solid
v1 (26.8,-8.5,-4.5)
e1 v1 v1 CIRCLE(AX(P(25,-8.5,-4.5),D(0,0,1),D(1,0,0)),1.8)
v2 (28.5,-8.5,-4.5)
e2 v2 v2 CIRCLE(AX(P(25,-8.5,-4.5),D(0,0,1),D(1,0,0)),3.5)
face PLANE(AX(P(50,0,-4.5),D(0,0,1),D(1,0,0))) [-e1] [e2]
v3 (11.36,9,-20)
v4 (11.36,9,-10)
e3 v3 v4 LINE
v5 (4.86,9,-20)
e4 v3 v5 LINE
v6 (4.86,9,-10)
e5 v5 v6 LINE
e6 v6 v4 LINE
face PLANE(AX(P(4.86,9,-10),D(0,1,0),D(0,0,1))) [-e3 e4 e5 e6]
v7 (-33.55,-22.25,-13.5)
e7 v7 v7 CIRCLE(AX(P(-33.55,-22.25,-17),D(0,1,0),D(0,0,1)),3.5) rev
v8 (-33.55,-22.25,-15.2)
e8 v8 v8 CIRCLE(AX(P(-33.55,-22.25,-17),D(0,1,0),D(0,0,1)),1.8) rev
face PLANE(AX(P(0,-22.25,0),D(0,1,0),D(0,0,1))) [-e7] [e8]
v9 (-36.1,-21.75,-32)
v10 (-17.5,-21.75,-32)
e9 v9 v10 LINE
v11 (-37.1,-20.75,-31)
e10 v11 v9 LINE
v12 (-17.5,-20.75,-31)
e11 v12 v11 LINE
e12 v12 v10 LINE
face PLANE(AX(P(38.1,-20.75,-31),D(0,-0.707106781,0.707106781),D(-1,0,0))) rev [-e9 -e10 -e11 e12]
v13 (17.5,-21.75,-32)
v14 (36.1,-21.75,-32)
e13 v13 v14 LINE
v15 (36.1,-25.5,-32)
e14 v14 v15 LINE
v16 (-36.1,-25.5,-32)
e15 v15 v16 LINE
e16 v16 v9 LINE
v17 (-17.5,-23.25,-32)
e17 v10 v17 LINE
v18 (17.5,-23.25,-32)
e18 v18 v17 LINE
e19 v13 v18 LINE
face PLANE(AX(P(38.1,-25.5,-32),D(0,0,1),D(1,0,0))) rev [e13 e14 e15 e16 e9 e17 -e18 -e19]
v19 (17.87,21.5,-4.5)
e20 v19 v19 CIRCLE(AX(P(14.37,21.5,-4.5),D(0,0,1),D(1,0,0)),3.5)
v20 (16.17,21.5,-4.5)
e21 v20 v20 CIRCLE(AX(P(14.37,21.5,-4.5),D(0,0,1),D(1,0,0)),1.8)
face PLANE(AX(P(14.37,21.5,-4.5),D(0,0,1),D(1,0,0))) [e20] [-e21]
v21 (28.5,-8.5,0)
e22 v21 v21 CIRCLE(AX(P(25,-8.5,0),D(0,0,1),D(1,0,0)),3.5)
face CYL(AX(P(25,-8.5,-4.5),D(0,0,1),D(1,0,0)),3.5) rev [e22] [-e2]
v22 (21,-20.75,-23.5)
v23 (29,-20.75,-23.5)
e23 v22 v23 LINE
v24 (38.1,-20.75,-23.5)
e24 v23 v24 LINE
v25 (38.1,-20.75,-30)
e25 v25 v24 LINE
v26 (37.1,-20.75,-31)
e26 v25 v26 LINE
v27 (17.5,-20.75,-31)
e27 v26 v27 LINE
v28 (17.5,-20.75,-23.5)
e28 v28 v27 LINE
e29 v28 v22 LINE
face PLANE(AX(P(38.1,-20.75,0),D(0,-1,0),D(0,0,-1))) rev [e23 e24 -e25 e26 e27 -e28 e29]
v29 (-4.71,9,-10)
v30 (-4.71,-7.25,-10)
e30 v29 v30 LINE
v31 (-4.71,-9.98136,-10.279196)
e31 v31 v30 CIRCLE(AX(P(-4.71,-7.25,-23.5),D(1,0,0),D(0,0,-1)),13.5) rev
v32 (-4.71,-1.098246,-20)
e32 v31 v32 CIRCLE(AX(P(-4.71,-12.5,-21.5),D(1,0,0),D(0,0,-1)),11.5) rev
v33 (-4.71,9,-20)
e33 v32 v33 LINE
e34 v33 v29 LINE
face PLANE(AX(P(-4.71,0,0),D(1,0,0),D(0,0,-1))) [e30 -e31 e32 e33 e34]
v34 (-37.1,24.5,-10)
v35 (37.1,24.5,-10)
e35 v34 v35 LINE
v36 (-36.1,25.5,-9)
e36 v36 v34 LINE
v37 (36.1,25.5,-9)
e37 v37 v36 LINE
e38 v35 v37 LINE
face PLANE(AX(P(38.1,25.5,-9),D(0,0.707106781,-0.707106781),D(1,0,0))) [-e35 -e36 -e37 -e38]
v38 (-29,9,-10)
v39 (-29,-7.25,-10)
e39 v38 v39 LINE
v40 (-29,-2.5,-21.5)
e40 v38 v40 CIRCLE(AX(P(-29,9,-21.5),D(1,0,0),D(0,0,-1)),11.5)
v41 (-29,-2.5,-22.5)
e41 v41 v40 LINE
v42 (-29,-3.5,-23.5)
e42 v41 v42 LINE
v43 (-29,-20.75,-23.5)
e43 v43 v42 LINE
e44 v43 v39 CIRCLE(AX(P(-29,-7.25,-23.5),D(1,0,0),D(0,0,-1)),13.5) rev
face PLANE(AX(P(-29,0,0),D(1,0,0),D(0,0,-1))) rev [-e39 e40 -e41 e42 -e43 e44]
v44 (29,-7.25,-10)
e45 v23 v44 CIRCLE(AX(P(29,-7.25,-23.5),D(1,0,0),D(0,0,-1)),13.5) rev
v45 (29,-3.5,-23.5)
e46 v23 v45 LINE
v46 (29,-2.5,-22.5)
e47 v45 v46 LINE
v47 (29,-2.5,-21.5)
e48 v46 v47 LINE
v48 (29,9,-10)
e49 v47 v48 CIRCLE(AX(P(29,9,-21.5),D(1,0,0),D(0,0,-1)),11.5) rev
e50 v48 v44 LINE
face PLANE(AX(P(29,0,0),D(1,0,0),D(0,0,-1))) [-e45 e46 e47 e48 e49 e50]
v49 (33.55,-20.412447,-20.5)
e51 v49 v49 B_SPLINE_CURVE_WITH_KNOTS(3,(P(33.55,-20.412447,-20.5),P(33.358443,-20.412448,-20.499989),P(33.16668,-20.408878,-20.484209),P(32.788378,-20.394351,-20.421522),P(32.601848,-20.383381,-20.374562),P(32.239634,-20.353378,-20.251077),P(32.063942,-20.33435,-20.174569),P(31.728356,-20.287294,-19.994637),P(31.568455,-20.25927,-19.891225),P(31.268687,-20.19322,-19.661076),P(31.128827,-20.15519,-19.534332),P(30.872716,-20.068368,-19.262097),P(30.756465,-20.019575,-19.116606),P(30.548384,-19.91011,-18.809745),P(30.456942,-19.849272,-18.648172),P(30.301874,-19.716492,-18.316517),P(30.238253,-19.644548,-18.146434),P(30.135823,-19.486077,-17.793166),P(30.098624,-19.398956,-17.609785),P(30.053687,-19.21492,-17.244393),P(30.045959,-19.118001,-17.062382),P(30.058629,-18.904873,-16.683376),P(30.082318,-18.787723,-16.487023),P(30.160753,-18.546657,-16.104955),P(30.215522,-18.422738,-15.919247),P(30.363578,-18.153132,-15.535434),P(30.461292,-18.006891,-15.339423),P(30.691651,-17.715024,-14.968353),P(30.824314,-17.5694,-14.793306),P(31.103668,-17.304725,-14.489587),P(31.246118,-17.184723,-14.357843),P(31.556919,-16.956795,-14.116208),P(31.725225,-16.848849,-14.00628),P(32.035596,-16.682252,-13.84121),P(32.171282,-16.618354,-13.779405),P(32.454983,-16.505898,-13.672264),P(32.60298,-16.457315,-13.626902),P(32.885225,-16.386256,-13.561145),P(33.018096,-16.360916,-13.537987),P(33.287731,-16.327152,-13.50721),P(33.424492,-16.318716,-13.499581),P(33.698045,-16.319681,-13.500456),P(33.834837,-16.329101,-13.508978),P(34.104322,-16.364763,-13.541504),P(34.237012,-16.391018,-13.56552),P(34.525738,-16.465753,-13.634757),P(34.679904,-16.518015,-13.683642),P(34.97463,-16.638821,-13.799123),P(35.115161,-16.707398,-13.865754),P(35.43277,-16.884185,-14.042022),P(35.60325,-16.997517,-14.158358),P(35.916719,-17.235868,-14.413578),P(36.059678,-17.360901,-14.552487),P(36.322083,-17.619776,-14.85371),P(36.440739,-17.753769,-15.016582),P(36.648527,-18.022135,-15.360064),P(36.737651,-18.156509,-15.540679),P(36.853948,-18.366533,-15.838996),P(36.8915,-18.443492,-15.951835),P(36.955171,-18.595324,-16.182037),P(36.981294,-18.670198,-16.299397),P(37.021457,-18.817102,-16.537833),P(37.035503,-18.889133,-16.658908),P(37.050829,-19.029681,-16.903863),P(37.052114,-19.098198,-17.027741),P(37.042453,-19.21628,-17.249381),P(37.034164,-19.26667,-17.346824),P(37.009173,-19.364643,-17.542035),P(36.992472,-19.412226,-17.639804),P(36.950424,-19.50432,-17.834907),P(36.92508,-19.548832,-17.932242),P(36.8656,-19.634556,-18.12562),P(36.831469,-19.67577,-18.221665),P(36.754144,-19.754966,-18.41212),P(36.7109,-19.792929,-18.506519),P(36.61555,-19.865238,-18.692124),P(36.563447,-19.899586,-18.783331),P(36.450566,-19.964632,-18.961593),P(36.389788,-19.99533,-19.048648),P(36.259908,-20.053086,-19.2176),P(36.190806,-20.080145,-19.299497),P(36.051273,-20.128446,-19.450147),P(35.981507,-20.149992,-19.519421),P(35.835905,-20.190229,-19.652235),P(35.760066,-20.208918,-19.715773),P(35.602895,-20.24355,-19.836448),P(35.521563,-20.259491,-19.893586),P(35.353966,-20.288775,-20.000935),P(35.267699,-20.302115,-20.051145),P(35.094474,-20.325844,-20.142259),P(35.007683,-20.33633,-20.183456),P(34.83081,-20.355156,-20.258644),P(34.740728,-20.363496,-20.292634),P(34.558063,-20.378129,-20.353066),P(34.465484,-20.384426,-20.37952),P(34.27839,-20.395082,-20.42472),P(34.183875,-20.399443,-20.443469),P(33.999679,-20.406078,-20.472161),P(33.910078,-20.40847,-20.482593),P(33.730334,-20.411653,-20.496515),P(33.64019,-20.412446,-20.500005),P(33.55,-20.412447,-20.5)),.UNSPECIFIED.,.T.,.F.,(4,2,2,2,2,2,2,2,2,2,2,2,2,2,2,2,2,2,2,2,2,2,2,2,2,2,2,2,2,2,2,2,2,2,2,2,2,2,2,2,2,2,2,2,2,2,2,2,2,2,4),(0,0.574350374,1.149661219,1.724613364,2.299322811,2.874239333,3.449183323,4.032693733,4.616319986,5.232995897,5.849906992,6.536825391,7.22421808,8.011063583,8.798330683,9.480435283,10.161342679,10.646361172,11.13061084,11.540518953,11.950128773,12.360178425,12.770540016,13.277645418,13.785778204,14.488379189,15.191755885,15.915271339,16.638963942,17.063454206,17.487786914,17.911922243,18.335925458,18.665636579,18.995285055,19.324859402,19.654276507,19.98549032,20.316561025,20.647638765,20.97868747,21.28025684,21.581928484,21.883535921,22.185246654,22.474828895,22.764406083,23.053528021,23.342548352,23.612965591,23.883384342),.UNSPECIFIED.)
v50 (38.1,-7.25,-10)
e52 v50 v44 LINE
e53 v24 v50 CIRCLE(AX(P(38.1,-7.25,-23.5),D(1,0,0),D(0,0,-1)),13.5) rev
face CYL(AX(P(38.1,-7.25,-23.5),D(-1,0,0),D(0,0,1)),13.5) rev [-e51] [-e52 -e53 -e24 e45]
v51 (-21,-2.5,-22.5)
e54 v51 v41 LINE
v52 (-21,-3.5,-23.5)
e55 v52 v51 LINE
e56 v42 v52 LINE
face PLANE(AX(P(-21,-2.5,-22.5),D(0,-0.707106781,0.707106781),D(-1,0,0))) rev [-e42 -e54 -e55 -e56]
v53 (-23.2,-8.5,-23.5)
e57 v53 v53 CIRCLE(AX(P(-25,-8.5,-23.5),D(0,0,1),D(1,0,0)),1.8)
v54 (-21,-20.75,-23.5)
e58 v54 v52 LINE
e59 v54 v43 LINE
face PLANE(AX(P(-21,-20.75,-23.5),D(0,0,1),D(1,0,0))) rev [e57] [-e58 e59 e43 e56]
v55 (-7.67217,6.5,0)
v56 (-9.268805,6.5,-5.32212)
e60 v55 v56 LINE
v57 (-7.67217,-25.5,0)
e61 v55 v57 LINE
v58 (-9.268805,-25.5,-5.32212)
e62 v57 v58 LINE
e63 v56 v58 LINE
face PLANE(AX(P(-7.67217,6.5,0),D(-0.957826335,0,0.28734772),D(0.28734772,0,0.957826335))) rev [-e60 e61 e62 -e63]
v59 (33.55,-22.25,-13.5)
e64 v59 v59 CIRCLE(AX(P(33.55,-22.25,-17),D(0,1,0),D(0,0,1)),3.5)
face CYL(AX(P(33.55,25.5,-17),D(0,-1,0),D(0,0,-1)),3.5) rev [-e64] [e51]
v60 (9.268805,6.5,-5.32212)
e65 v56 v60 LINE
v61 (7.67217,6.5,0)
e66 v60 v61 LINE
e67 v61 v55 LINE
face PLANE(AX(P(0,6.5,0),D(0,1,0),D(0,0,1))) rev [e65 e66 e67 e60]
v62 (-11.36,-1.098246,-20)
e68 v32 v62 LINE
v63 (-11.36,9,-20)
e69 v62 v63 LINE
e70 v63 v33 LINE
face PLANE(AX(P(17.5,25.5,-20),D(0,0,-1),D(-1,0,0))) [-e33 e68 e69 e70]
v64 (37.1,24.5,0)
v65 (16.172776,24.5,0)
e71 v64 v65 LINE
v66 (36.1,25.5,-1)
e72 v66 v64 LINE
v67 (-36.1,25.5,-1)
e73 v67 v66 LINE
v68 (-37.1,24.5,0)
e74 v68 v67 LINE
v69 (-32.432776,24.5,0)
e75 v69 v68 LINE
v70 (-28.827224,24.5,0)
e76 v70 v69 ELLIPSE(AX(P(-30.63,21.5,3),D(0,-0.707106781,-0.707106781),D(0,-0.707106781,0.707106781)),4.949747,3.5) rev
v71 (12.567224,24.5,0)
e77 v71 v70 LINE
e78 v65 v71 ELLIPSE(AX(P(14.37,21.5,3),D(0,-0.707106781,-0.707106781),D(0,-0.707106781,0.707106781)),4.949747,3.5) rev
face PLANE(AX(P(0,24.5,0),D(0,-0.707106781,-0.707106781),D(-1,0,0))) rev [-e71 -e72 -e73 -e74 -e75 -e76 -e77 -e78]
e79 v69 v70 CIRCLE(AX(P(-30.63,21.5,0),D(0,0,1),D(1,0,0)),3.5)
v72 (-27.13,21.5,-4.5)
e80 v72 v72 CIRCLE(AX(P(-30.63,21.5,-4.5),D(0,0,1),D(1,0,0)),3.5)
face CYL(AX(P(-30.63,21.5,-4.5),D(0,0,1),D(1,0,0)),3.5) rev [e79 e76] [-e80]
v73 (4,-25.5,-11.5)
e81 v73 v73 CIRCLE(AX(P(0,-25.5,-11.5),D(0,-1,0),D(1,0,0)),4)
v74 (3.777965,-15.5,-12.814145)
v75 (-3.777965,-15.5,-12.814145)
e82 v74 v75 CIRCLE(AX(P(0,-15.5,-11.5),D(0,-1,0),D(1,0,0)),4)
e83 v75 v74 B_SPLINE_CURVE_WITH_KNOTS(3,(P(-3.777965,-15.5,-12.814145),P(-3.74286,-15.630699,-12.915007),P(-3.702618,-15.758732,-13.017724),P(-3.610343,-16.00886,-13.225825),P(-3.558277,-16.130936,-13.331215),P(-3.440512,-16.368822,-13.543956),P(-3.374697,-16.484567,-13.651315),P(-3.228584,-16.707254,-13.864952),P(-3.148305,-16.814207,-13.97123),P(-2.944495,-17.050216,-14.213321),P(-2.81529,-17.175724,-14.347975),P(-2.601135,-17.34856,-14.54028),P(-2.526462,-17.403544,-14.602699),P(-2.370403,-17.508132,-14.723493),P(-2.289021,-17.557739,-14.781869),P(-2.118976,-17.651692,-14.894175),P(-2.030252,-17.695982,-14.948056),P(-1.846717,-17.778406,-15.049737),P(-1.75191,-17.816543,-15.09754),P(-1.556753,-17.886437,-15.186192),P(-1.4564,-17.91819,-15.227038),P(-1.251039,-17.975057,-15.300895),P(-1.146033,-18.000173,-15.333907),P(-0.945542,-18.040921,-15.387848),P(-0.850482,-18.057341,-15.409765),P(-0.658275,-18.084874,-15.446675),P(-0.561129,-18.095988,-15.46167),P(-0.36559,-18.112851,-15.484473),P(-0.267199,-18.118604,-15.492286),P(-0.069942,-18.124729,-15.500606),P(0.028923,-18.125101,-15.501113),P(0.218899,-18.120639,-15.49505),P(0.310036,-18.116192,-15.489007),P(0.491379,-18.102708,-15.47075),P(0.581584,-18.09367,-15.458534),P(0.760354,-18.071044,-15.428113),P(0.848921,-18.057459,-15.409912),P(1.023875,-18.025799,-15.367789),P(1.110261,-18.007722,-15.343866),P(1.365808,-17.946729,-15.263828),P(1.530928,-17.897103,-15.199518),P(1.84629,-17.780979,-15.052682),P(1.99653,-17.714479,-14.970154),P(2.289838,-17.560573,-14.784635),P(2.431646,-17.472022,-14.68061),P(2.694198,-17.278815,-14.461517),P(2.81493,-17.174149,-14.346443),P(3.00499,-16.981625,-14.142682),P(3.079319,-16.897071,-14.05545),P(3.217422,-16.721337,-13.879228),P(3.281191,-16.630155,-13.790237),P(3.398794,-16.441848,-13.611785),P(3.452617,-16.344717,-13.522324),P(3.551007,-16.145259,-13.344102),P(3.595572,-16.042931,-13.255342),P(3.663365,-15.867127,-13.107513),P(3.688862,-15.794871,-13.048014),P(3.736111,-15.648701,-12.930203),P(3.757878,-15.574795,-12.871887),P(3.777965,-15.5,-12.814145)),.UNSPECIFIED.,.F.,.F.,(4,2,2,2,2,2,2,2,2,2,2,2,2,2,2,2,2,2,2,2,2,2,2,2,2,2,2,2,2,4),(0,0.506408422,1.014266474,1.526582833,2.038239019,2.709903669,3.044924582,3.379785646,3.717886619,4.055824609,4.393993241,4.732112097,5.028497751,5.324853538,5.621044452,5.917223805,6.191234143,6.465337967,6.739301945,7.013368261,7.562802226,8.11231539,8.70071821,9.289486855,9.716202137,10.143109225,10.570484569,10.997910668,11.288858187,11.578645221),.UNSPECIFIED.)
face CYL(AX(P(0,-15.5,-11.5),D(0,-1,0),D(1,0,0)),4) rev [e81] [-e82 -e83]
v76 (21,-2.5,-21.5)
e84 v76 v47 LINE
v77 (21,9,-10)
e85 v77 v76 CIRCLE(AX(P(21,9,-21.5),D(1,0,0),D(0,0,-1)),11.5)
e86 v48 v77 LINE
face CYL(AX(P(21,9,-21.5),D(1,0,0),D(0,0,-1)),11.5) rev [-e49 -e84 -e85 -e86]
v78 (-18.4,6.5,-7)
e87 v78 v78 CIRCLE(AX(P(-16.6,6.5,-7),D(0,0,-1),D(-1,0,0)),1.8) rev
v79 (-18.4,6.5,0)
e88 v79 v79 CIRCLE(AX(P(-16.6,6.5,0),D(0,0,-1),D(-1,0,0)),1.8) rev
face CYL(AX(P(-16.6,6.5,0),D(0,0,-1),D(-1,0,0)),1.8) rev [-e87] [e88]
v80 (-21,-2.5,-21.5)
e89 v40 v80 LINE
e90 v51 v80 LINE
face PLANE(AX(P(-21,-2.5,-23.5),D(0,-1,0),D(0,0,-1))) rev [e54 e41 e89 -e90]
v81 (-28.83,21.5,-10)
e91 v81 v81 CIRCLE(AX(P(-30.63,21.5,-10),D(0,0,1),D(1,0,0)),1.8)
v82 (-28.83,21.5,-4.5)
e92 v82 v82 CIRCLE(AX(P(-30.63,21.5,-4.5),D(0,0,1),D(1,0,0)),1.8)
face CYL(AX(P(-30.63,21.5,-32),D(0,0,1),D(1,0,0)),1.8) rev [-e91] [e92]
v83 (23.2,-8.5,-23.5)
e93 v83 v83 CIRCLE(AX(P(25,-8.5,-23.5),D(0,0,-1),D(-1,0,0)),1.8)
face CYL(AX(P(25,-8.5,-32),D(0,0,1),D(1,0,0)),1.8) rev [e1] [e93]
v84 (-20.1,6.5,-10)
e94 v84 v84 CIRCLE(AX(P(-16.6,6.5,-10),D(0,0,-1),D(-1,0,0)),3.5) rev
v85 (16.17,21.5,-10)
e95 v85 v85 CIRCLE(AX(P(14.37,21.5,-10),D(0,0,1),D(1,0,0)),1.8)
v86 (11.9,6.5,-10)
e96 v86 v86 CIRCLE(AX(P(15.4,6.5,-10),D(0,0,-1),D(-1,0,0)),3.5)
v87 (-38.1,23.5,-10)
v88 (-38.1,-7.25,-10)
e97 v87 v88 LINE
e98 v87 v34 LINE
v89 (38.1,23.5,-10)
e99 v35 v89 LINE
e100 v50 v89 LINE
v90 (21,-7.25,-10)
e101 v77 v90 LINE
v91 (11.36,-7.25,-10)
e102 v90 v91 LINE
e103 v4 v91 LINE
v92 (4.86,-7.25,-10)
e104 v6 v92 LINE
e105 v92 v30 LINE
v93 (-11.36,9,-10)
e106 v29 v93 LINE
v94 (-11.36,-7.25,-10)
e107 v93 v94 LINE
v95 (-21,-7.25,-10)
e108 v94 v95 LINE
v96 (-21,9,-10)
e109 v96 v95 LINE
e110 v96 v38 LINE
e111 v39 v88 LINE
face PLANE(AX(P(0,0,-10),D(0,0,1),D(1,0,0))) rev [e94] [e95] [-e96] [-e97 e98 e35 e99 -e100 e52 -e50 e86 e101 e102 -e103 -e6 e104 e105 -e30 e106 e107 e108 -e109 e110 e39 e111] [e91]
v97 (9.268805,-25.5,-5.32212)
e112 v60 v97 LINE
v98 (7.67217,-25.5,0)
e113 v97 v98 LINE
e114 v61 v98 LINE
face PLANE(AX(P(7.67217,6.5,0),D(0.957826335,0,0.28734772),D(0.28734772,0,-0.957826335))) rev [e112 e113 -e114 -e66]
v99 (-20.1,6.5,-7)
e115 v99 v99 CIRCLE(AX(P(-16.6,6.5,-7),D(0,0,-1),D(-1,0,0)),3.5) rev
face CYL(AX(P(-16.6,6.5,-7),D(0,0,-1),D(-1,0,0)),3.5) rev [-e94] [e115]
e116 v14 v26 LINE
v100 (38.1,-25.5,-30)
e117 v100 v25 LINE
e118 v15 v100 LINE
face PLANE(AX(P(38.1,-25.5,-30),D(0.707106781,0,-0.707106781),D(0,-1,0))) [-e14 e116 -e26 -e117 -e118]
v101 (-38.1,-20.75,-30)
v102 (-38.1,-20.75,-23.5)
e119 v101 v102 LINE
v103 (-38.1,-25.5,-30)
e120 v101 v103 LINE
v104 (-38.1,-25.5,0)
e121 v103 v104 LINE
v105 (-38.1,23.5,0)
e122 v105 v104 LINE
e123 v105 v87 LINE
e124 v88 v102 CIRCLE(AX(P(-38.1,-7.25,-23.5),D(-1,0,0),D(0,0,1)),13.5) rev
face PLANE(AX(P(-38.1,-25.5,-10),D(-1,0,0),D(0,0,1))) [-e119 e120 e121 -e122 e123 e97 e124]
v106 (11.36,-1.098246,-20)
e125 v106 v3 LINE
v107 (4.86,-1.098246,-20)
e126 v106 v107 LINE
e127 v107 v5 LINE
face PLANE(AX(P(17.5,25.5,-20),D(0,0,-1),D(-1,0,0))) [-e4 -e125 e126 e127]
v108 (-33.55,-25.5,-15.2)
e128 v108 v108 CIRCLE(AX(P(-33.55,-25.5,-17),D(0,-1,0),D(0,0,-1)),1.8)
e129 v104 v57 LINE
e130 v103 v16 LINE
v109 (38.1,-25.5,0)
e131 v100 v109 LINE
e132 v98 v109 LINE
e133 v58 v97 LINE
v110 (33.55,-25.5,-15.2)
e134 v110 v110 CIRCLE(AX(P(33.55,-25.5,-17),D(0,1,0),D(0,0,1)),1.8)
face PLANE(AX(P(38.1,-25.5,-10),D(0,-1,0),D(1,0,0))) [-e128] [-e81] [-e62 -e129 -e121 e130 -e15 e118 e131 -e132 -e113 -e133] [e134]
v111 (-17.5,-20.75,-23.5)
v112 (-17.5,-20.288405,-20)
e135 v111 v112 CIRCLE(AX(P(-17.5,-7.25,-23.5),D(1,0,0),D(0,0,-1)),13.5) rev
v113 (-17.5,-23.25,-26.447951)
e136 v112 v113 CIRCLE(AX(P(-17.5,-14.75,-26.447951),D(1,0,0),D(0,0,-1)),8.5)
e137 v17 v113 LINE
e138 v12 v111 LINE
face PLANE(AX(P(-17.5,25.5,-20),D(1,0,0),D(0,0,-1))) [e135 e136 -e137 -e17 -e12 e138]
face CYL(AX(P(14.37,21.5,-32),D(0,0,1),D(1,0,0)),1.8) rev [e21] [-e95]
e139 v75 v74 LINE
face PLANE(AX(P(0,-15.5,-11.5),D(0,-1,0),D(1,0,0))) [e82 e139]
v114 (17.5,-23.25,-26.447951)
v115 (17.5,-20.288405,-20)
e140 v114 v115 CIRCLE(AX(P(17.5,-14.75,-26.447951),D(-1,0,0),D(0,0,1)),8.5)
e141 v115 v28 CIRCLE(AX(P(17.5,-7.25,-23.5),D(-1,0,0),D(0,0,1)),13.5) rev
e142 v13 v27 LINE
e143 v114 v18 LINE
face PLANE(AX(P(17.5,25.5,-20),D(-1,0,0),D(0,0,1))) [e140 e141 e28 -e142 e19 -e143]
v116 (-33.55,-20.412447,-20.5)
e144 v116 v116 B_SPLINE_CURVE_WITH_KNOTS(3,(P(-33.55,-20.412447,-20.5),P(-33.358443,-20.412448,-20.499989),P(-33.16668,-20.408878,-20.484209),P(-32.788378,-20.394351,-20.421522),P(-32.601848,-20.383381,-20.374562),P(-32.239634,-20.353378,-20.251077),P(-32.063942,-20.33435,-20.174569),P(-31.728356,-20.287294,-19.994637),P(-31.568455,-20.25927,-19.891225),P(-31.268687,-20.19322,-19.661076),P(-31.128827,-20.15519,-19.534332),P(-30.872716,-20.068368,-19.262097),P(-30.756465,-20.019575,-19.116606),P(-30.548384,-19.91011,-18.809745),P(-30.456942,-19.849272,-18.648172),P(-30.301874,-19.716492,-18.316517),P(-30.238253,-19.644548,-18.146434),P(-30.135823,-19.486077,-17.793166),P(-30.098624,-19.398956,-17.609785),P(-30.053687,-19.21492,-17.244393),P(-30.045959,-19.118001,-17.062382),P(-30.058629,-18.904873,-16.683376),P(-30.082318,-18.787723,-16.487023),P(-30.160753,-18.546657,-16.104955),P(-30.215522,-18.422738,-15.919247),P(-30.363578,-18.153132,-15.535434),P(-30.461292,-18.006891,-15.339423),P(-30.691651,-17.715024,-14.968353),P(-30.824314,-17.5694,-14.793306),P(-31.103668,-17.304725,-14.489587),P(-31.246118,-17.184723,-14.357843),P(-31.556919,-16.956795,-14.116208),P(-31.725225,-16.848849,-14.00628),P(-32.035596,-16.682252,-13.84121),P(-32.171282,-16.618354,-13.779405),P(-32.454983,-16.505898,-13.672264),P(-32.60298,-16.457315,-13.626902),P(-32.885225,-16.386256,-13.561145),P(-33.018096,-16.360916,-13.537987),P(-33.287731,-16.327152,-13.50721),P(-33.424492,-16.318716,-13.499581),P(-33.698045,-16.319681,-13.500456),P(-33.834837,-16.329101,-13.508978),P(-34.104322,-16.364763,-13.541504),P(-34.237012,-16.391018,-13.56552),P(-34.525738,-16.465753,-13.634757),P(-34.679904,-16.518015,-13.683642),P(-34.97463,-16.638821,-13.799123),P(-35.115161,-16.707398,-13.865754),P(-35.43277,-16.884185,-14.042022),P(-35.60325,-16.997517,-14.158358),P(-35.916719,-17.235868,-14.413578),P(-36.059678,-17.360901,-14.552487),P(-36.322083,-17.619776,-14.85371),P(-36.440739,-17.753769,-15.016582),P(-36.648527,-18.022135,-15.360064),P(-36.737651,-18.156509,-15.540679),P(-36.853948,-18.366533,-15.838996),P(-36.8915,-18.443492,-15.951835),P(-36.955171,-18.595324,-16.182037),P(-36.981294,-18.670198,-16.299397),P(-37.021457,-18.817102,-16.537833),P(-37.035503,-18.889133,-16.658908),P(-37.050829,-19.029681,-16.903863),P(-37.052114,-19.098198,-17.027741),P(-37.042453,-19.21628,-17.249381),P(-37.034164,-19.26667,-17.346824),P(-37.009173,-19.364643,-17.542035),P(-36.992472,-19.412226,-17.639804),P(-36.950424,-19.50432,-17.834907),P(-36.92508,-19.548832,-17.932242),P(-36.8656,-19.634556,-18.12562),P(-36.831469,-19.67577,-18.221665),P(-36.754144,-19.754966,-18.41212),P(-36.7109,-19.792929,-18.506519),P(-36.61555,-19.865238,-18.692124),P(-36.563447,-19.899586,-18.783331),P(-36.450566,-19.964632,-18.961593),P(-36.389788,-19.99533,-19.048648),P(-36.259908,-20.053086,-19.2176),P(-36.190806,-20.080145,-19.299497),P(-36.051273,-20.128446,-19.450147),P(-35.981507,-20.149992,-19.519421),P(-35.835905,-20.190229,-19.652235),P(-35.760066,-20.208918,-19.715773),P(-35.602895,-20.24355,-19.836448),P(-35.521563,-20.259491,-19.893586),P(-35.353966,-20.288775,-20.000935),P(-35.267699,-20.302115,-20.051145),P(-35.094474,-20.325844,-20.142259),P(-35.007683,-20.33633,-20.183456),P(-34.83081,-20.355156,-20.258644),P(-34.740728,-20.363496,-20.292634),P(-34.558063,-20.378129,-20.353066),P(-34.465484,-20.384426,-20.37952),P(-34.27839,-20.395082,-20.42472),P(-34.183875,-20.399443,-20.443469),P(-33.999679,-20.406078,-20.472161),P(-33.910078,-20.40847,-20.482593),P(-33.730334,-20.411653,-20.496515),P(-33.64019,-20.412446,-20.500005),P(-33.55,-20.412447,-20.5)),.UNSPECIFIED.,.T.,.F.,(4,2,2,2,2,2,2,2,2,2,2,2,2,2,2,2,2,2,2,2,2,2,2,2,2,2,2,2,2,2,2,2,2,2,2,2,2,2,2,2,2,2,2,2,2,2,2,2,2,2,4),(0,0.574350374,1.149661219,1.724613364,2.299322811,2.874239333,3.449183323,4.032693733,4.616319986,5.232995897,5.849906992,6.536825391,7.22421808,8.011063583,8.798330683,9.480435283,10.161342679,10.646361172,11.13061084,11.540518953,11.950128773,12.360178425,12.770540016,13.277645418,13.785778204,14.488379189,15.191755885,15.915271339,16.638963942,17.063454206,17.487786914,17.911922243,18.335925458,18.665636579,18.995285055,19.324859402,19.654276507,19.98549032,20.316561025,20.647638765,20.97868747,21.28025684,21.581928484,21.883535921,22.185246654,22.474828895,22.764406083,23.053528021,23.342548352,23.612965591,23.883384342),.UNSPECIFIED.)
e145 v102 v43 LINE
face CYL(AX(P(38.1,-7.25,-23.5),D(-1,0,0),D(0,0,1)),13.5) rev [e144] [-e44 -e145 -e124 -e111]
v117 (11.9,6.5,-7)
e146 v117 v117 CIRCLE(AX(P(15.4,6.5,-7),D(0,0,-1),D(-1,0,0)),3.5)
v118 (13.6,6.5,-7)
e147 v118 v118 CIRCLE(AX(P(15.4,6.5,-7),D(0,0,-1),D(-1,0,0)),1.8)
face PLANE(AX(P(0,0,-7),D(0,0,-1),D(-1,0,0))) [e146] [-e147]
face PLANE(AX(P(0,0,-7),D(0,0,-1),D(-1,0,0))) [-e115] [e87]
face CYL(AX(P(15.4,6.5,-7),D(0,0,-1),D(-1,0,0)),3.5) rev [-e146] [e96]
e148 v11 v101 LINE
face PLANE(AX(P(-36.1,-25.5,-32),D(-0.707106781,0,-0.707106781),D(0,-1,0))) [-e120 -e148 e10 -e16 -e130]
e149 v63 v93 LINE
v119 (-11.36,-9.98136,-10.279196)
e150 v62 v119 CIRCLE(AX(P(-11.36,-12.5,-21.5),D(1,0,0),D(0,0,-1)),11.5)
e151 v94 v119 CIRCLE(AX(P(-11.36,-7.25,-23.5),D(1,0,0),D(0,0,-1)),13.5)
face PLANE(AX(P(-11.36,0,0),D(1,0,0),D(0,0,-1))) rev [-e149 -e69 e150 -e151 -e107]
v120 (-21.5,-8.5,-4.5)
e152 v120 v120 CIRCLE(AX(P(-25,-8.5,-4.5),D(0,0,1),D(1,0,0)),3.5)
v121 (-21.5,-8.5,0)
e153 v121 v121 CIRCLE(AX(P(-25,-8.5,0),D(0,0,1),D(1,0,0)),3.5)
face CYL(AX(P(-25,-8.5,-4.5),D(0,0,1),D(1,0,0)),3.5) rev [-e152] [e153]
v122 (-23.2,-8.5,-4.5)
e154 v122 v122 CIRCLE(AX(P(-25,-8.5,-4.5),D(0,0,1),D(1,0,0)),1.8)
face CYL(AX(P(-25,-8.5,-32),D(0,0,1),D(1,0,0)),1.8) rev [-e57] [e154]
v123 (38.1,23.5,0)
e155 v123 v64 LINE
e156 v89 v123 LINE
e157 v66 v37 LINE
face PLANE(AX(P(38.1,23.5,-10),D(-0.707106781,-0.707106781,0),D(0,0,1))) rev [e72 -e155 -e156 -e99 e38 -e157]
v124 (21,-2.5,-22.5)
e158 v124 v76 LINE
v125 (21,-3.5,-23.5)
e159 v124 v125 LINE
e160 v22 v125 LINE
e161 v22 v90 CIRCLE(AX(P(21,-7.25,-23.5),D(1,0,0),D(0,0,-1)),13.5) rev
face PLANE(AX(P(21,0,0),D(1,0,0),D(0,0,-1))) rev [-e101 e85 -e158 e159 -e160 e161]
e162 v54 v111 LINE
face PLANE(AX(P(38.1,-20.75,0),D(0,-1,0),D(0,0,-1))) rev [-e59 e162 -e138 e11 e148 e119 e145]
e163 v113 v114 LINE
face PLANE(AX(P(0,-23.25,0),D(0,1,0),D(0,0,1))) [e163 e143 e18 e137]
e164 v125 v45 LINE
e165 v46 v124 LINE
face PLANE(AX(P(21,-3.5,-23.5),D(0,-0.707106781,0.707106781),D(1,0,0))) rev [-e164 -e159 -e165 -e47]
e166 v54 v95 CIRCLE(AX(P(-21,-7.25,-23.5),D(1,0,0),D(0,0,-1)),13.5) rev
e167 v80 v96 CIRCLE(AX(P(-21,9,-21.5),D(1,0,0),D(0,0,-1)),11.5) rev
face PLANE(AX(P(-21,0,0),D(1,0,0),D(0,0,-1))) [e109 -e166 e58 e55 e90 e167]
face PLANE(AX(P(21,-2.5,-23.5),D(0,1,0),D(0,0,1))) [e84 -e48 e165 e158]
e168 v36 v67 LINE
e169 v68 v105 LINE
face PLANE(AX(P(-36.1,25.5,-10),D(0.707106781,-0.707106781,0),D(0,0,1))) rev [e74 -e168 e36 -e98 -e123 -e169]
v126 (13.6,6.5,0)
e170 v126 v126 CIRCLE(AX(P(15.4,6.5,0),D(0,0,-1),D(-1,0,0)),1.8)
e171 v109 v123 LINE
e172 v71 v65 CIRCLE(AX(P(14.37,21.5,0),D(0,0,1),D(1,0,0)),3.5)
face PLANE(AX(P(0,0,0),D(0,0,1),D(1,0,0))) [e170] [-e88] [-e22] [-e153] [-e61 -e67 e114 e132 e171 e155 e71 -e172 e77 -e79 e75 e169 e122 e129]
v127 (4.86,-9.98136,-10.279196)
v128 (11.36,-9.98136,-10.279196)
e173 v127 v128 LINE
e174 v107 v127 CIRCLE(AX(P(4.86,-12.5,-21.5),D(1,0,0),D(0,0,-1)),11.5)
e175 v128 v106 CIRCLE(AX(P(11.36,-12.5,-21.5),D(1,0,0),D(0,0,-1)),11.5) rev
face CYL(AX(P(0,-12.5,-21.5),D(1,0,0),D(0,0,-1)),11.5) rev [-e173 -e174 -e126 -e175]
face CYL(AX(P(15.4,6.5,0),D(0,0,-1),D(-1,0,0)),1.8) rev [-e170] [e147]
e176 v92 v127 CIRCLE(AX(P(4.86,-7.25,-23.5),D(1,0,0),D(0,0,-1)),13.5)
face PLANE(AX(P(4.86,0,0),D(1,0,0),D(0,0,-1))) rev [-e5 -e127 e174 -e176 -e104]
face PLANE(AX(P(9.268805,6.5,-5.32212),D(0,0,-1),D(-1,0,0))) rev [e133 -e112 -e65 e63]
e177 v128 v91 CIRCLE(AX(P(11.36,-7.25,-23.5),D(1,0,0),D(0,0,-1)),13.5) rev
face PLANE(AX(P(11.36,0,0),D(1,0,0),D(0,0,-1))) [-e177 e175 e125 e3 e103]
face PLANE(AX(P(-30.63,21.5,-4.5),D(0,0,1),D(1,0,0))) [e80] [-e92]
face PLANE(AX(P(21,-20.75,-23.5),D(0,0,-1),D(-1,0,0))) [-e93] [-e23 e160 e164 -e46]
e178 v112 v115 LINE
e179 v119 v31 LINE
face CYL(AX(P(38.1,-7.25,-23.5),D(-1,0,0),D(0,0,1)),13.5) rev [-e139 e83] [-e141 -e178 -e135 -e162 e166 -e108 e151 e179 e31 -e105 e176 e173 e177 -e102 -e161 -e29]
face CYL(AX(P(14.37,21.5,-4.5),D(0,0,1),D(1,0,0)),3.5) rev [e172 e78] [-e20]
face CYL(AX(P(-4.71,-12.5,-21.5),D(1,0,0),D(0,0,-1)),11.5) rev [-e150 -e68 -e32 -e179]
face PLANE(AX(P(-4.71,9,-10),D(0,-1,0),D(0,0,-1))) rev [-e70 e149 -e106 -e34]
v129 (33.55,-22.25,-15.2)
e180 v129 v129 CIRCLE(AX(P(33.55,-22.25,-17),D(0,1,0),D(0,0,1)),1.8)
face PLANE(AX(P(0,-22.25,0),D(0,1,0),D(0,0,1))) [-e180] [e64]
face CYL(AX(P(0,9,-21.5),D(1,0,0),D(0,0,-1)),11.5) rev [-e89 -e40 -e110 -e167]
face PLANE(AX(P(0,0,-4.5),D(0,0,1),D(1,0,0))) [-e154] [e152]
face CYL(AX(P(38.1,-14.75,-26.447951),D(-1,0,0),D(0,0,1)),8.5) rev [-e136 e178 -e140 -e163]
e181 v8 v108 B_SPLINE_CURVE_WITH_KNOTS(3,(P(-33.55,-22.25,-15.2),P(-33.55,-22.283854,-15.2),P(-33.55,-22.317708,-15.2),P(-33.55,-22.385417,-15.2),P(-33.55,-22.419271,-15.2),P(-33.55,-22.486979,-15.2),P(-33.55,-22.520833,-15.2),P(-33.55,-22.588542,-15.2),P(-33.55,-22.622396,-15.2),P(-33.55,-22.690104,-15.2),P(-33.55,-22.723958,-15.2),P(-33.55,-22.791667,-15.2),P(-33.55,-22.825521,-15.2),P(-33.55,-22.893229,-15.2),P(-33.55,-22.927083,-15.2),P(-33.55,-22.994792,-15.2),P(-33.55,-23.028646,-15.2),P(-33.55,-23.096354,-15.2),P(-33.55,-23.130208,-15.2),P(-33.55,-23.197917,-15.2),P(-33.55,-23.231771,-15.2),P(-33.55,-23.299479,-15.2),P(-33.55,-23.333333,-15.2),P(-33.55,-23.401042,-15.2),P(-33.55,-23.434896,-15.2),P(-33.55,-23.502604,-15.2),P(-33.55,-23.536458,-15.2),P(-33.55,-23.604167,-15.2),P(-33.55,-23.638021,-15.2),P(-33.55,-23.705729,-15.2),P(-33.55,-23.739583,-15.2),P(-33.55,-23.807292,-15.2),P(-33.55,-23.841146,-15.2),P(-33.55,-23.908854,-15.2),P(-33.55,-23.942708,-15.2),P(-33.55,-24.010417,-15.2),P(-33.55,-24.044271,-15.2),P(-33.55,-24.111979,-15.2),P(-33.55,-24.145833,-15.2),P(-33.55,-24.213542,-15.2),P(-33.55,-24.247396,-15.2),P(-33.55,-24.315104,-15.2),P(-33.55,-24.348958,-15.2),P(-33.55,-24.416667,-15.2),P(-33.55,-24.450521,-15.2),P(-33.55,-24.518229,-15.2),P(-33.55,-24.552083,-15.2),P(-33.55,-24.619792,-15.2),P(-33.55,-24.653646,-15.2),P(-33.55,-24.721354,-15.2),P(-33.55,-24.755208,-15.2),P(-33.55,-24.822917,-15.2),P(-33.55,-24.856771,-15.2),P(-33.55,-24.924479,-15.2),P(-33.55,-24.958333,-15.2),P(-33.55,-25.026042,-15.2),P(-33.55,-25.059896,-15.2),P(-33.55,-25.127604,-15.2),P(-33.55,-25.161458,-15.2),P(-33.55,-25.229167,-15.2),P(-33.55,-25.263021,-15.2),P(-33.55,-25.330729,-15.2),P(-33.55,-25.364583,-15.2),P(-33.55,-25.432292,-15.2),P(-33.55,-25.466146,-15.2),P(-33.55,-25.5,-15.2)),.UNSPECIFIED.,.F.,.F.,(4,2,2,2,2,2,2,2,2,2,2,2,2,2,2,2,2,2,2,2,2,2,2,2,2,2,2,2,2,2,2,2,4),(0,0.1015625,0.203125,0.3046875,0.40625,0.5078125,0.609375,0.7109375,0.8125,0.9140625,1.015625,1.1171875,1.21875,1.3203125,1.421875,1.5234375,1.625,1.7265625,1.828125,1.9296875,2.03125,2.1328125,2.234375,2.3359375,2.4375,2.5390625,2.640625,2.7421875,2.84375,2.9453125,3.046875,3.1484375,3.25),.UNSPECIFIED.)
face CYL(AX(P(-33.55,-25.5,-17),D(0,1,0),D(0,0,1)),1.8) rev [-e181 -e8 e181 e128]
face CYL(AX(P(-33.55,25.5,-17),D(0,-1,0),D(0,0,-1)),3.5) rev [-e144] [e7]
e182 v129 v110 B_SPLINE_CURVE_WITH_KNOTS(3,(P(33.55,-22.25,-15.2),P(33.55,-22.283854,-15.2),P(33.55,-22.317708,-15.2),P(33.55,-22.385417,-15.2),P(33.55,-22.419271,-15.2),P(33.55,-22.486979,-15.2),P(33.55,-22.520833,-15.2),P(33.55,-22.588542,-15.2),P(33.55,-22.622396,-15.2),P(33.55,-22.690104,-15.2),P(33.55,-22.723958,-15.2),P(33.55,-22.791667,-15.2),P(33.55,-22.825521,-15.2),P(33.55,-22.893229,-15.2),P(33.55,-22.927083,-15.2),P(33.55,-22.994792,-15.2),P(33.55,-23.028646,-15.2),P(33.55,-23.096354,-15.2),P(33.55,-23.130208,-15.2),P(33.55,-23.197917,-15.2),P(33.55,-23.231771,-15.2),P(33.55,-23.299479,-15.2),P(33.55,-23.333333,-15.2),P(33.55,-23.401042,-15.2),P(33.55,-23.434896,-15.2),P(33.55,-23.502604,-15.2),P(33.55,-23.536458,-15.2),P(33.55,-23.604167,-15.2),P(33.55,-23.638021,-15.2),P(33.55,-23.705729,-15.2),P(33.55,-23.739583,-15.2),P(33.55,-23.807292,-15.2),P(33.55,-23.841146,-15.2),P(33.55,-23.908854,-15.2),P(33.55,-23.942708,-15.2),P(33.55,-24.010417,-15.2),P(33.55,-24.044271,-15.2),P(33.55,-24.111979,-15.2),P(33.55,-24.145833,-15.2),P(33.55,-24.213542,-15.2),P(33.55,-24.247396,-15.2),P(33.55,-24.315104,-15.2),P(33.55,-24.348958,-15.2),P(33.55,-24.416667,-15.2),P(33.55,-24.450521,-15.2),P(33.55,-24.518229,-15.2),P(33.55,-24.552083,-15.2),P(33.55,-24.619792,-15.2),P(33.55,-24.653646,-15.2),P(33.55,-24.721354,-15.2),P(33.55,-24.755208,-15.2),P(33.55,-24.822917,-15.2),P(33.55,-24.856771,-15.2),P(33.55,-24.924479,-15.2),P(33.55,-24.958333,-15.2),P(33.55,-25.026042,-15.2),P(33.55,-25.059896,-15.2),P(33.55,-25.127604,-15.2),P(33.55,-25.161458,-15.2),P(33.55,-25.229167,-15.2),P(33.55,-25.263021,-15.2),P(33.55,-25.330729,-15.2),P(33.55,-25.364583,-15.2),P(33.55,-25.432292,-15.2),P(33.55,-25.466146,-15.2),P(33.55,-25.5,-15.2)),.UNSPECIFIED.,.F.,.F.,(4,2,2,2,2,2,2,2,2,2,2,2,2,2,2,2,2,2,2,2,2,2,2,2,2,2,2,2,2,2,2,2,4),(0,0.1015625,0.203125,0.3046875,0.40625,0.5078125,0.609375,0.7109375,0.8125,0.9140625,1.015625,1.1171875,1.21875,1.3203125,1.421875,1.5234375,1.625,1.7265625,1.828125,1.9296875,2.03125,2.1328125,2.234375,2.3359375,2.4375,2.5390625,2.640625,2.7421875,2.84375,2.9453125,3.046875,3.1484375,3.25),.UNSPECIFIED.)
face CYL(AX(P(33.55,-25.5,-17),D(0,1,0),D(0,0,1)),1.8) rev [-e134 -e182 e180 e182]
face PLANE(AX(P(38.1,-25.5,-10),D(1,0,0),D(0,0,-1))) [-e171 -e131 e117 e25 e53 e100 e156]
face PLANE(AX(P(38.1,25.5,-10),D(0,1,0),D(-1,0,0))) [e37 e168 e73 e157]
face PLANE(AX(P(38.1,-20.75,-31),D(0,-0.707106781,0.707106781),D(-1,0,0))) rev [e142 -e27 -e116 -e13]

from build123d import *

# Parameters (mm, degrees)
SKETCH1_W                = 76.2
SKETCH1_H                = 51
BOSS_EXTRUDE1_DEPTH      = 10
CHAMFER1_SIZE            = 2
BOSS_EXTRUDE2_DEPTH      = 38.1
BOSS_EXTRUDE2_DEPTH_BACK = 38.1
SKETCH2_W                = 32
SKETCH2_H                = 4.75
CUT_EXTRUDE1_DEPTH       = 32
FILLET1_R                = 13.5
SKETCH4_R                = 4
CUT_EXTRUDE2_DEPTH       = 10
BOSS_EXTRUDE4_START      = -9.1
SKETCH5_W                = 13.5
SKETCH5_H                = 18.25
BOSS_EXTRUDE4_DEPTH      = 8
BOSS_EXTRUDE5_START      = -67.1
SKETCH5_4_W              = 13.5
SKETCH5_4_H              = 18.25
BOSS_EXTRUDE5_DEPTH      = 8
FILLET2_R                = 11.5
BOSS_EXTRUDE6_START      = -9.64
SKETCH7_W                = 13.5
SKETCH7_H                = 10
BOSS_EXTRUDE6_DEPTH      = 6.5
BOSS_EXTRUDE7_START      = -32.36
SKETCH7_2_W              = 13.5
SKETCH7_2_H              = 10
BOSS_EXTRUDE7_DEPTH      = 6.65
FILLET3_R                = 11.5
CHAMFER3_SIZE            = 2
CHAMFER4_SIZE            = 1
SKETCH8_R                = 3.5
SKETCH8_R_2              = 1.8
CUT_EXTRUDE3_DEPTH       = 4.5
SKETCH8_4_R              = 1.8
CUT_EXTRUDE6_DEPTH       = 56.909391028
LPATTERN1_COUNT          = 2
LPATTERN1_PITCH          = 45
SKETCH10_6_R             = 1.8
CUT_EXTRUDE17_DEPTH      = 51.851352048
SKETCH10_R               = 3.5
SKETCH10_R_2             = 1.8
CUT_EXTRUDE11_DEPTH      = 3
SKETCH12_R               = 1.8
CUT_EXTRUDE13_DEPTH      = 56.909391028
SKETCH12_4_R             = 3.5
SKETCH12_4_R_2           = 1.8
CUT_EXTRUDE14_DEPTH      = 4.5
LPATTERN3_COUNT          = 2
LPATTERN3_PITCH          = 50
CUT_EXTRUDE18_DEPTH      = 71.73817429
CUT_EXTRUDE18_DEPTH_BACK = 2.5
SKETCH13_W               = 35
SKETCH13_H               = 12
FILLET4_R                = 8.5
CUT_EXTRUDE19_DEPTH      = 68.931380819
CUT_EXTRUDE19_DEPTH_BACK = 1.5
SKETCH14_R               = 3.5
SKETCH14_R_2             = 1.8
CUT_EXTRUDE20_DEPTH      = 68.931380875
CUT_EXTRUDE20_DEPTH_BACK = 68.931380875
SKETCH14_4_R             = 1.8


with BuildPart() as part:
    # Sketch1 → Boss-Extrude1 (new body)
    with BuildSketch(Plane.XY):
        Rectangle(SKETCH1_W, SKETCH1_H)
    extrude(amount=-BOSS_EXTRUDE1_DEPTH)

    # Chamfer1
    chamfer1_edges = [part.edges().sort_by_distance(p)[0] for p in [
        (-38.1, 25.5, -5),
        (38.1, 25.5, -5),
    ]]
    chamfer(chamfer1_edges, length=CHAMFER1_SIZE)

    # Sketch2 → Boss-Extrude2 (add, two sides: drawn at the far end of the back side and taken through both)
    with BuildSketch(Plane(origin=(0, 0, 0), x_dir=(0, 0, -1), z_dir=(1, 0, 0)).offset(-BOSS_EXTRUDE2_DEPTH_BACK)):
        with Locations((16, -23.125)):
            Rectangle(SKETCH2_W, SKETCH2_H)
    extrude(amount=BOSS_EXTRUDE2_DEPTH + BOSS_EXTRUDE2_DEPTH_BACK)

    # Sketch3 → Cut-Extrude1 (cut)
    with BuildSketch(Plane(origin=(0, -25.5, 0), x_dir=(-1, 0, 0), z_dir=(0, -1, 0))):
        Polygon((-7.67217, 0), (7.67217, 0), (9.268805, 5.32212), (-9.268805, 5.32212), align=None)
    extrude(amount=-CUT_EXTRUDE1_DEPTH, mode=Mode.SUBTRACT)

    # Fillet1
    fillet1_edges = [part.edges().sort_by_distance(p)[0] for p in [
        (0, -20.75, -10),
    ]]
    fillet(fillet1_edges, radius=FILLET1_R)

    # Sketch4 → Cut-Extrude2 (cut)
    with BuildSketch(Plane.XZ.offset(25.5)):
        with Locations((0, -11.5)):
            Circle(SKETCH4_R)
    extrude(amount=-CUT_EXTRUDE2_DEPTH, mode=Mode.SUBTRACT)

    # Sketch5 → Boss-Extrude4 (add)
    with BuildSketch(Plane(origin=(38.1, 0, 0), x_dir=(0, 0, -1), z_dir=(1, 0, 0)).offset(BOSS_EXTRUDE4_START)):
        with Locations((16.75, -11.625)):
            Rectangle(SKETCH5_W, SKETCH5_H)
    extrude(amount=-BOSS_EXTRUDE4_DEPTH)

    # Sketch5<4> → Boss-Extrude5 (add)
    with BuildSketch(Plane(origin=(38.1, 0, 0), x_dir=(0, 0, -1), z_dir=(1, 0, 0)).offset(BOSS_EXTRUDE5_START)):
        with Locations((16.75, -11.625)):
            Rectangle(SKETCH5_4_W, SKETCH5_4_H)
    extrude(amount=BOSS_EXTRUDE5_DEPTH)

    # Fillet2
    fillet2_edges = [part.edges().sort_by_distance(p)[0] for p in [
        (25, -2.5, -10),
        (-25, -2.5, -10),
    ]]
    fillet(fillet2_edges, radius=FILLET2_R)

    # Sketch7 → Boss-Extrude6 (add)
    with BuildSketch(Plane(origin=(21, 0, 0), x_dir=(0, 0, -1), z_dir=(1, 0, 0)).offset(BOSS_EXTRUDE6_START)):
        with Locations((16.75, 4)):
            Rectangle(SKETCH7_W, SKETCH7_H)
    extrude(amount=-BOSS_EXTRUDE6_DEPTH)

    # Sketch7<2> → Boss-Extrude7 (add)
    with BuildSketch(Plane(origin=(21, 0, 0), x_dir=(0, 0, -1), z_dir=(1, 0, 0)).offset(BOSS_EXTRUDE7_START)):
        with Locations((16.75, 4)):
            Rectangle(SKETCH7_2_W, SKETCH7_2_H)
    extrude(amount=BOSS_EXTRUDE7_DEPTH)

    # Fillet3
    # the kernel refuses this fillet: 11.5 mm, written as the material it adds along each edge
    with BuildSketch(Plane(origin=(11.36, -1, -10), x_dir=(0, -1, 0), z_dir=(-1, 0, 0))) as fillet3_piece_1:
        with BuildLine():
            CenterArc((FILLET3_R, -FILLET3_R), FILLET3_R, 90, 90)
            Line((0, -FILLET3_R), (0, 0))
            Line((0, 0), (FILLET3_R, 0))
        make_face()
    extrude(amount=6.5)
    with BuildSketch(Plane(origin=(11.36, -1, -10), x_dir=(0, -1, 0), z_dir=(-1, 0, 0))) as fillet3_piece_2_section:
        with BuildLine():
            CenterArc((FILLET3_R, -FILLET3_R), FILLET3_R, 90, 90)
            Line((0, -FILLET3_R), (0, 0))
            Line((0, 0), (FILLET3_R, 0))
        make_face()
    fillet3_piece_2 = extrude(amount=35.25, mode=Mode.PRIVATE)
    fillet3_piece_2 = split(fillet3_piece_2, bisect_by=Plane(origin=(-4.71, -3.603543814, -12.603543814), z_dir=(-1, 0, 0)), keep=Keep.TOP, mode=Mode.PRIVATE)
    fillet3_piece_2 = split(fillet3_piece_2, bisect_by=Plane(origin=(-11.36, -3.603543814, -12.603543814), z_dir=(1, 0, 0)), keep=Keep.TOP, mode=Mode.PRIVATE)
    add(fillet3_piece_2)
    with BuildSketch(Plane(origin=(-11.36, -1, -10), x_dir=(0, -1, 0), z_dir=(1, 0, 0))) as fillet3_piece_3:
        with BuildLine():
            CenterArc((FILLET3_R, FILLET3_R), FILLET3_R, 180, 90)
            Line((0, FILLET3_R), (0, 0))
            Line((0, 0), (FILLET3_R, 0))
        make_face()
    extrude(amount=6.65)
    with BuildSketch(Plane(origin=(-11.36, -1, -10), x_dir=(0, -1, 0), z_dir=(1, 0, 0))) as fillet3_piece_4_section:
        with BuildLine():
            CenterArc((FILLET3_R, FILLET3_R), FILLET3_R, 180, 90)
            Line((0, FILLET3_R), (0, 0))
            Line((0, 0), (FILLET3_R, 0))
        make_face()
    fillet3_piece_4 = extrude(amount=35.4, mode=Mode.PRIVATE)
    fillet3_piece_4 = split(fillet3_piece_4, bisect_by=Plane(origin=(11.36, -3.603543814, -12.603543814), z_dir=(-1, 0, 0)), keep=Keep.TOP, mode=Mode.PRIVATE)
    fillet3_piece_4 = split(fillet3_piece_4, bisect_by=Plane(origin=(4.86, -3.603543814, -12.603543814), z_dir=(1, 0, 0)), keep=Keep.TOP, mode=Mode.PRIVATE)
    add(fillet3_piece_4)

    # Chamfer3
    chamfer3_edges = [part.edges().sort_by_distance(p)[0] for p in [
        (38.1, -23.125, -32),
        (-38.1, -23.125, -32),
    ]]
    chamfer(chamfer3_edges, length=CHAMFER3_SIZE)

    # Chamfer4
    chamfer4_edges = [part.edges().sort_by_distance(p)[0] for p in [
        (-25, -2.5, -23.5),
        (8.11, 9, -23.5),
        (8.11, -1, -23.5),
        (0, 25.5, 0),
        (-8.035, -1, -23.5),
        (-8.035, 9, -23.5),
        (0, 25.5, -10),
        (0, -20.75, -32),
        (25, -2.5, -23.5),
    ]]
    chamfer(chamfer4_edges, length=CHAMFER4_SIZE)

    # Sketch8 → Cut-Extrude3 (cut)
    with BuildSketch(Plane.XY):
        with Locations((-30.63, 21.5)):
            Circle(SKETCH8_R)
        with Locations((-30.63, 21.5)):
            Circle(SKETCH8_R_2, mode=Mode.SUBTRACT)
    cut_extrude3 = extrude(amount=-CUT_EXTRUDE3_DEPTH, mode=Mode.SUBTRACT)

    # Sketch8<4> → Cut-Extrude6 (cut, through all)
    with BuildSketch(Plane.XY):
        with Locations((-30.63, 21.5)):
            Circle(SKETCH8_4_R)
    cut_extrude6 = extrude(amount=-CUT_EXTRUDE6_DEPTH, mode=Mode.SUBTRACT)

    # LPattern1: Cut-Extrude3, Cut-Extrude6 ×2
    with Locations(*[(i * LPATTERN1_PITCH, 0, 0) for i in range(1, LPATTERN1_COUNT)]):
        add(cut_extrude3, mode=Mode.SUBTRACT)
        add(cut_extrude6, mode=Mode.SUBTRACT)

    # Sketch10<6> → Cut-Extrude17 (cut, through all)
    with BuildSketch(Plane.XY.offset(-10)):
        with Locations(Location((-16.6, 6.5, 0), (0, 0, 180))):
            Circle(SKETCH10_6_R)
        with Locations(Location((15.4, 6.5, 0), (0, 0, 180))):
            Circle(SKETCH10_6_R)
    extrude(amount=CUT_EXTRUDE17_DEPTH, mode=Mode.SUBTRACT)

    # Sketch10 → Cut-Extrude11 (cut)
    # profile 1 of 2: a face of its own
    with BuildSketch(Plane.XY.offset(-10)):
        with Locations(Location((-16.6, 6.5, 0), (0, 0, 180))):
            Circle(SKETCH10_R)
        with Locations(Location((-16.6, 6.5, 0), (0, 0, 180))):
            Circle(SKETCH10_R_2, mode=Mode.SUBTRACT)
    # profile 2 of 2: a face of its own
    with BuildSketch(Plane.XY.offset(-10)):
        with Locations(Location((15.4, 6.5, 0), (0, 0, 180))):
            Circle(SKETCH10_R)
        with Locations(Location((15.4, 6.5, 0), (0, 0, 180))):
            Circle(SKETCH10_R_2, mode=Mode.SUBTRACT)
    extrude(amount=CUT_EXTRUDE11_DEPTH, mode=Mode.SUBTRACT)

    # Sketch12 → Cut-Extrude13 (cut, through all)
    with BuildSketch(Plane.XY):
        with Locations((-25, -8.5)):
            Circle(SKETCH12_R)
    cut_extrude13 = extrude(amount=-CUT_EXTRUDE13_DEPTH, mode=Mode.SUBTRACT)

    # Sketch12<4> → Cut-Extrude14 (cut)
    with BuildSketch(Plane.XY):
        with Locations((-25, -8.5)):
            Circle(SKETCH12_4_R)
        with Locations((-25, -8.5)):
            Circle(SKETCH12_4_R_2, mode=Mode.SUBTRACT)
    cut_extrude14 = extrude(amount=-CUT_EXTRUDE14_DEPTH, mode=Mode.SUBTRACT)

    # LPattern3: Cut-Extrude13, Cut-Extrude14 ×2
    with Locations(*[(i * LPATTERN3_PITCH, 0, 0) for i in range(1, LPATTERN3_COUNT)]):
        add(cut_extrude13, mode=Mode.SUBTRACT)
        add(cut_extrude14, mode=Mode.SUBTRACT)

    # Sketch13 → Cut-Extrude18 (cut, two sides: drawn at the far end of the back side and taken through both)
    with BuildSketch(Plane(origin=(0, -20.75, 5.592775926), x_dir=(1, 0, 0), z_dir=(0, 1, 0)).offset(-CUT_EXTRUDE18_DEPTH_BACK)):
        with Locations((0, 31.592775926)):
            Rectangle(SKETCH13_W, SKETCH13_H)
    extrude(amount=CUT_EXTRUDE18_DEPTH + CUT_EXTRUDE18_DEPTH_BACK, mode=Mode.SUBTRACT)

    # Fillet4
    # the kernel refuses this fillet: 8.5 mm, written as the material it adds along each edge
    with BuildSketch(Plane(origin=(33.619877511, -23.25, -20), x_dir=(0, 0, -1), z_dir=(-1, 0, 0))) as fillet4_piece_1:
        with BuildLine():
            CenterArc((6.447951004, -8.5), FILLET4_R, 90, 49.339390538)
            Line((0, -2.96159519), (-0.12895902, -2.850827093))
            ThreePointArc((-0.12895902, -2.850827093), (-0.17, -1.480797595), (-0.17, 0))
            Line((-0.17, 0), (0, 0.17))
            Line((0, 0.17), (6.447951004, 0.17))
            Line((6.447951004, 0.17), (6.447951004, 0))
        make_face()
    extrude(amount=67.239755022)

    # Sketch14 → Cut-Extrude19 (cut, two sides: drawn at the far end of the back side and taken through both)
    # profile 1 of 2: a face of its own
    with BuildSketch(Plane(origin=(0, -20.75, 0), x_dir=(1, 0, 0), z_dir=(0, 1, 0)).offset(-CUT_EXTRUDE19_DEPTH_BACK)):
        with Locations(Location((-33.55, 17, 0), (0, 0, 90))):
            Circle(SKETCH14_R)
        with Locations(Location((-33.55, 17, 0), (0, 0, 90))):
            Circle(SKETCH14_R_2, mode=Mode.SUBTRACT)
    # profile 2 of 2: a face of its own
    with BuildSketch(Plane(origin=(0, -20.75, 0), x_dir=(1, 0, 0), z_dir=(0, 1, 0)).offset(-CUT_EXTRUDE19_DEPTH_BACK)):
        with Locations(Location((33.55, 17, 0), (0, 0, 90))):
            Circle(SKETCH14_R)
        with Locations(Location((33.55, 17, 0), (0, 0, 90))):
            Circle(SKETCH14_R_2, mode=Mode.SUBTRACT)
    extrude(amount=CUT_EXTRUDE19_DEPTH + CUT_EXTRUDE19_DEPTH_BACK, mode=Mode.SUBTRACT)

    # Sketch14<4> → Cut-Extrude20 (cut, two sides: drawn at the far end of the back side and taken through both)
    with BuildSketch(Plane(origin=(0, -20.75, 0), x_dir=(1, 0, 0), z_dir=(0, 1, 0)).offset(-CUT_EXTRUDE20_DEPTH_BACK)):
        with Locations(Location((33.55, 17, 0), (0, 0, 270))):
            Circle(SKETCH14_4_R)
        with Locations(Location((-33.55, 17, 0), (0, 0, 270))):
            Circle(SKETCH14_4_R)
    extrude(amount=CUT_EXTRUDE20_DEPTH + CUT_EXTRUDE20_DEPTH_BACK, mode=Mode.SUBTRACT)


solid = part.part
